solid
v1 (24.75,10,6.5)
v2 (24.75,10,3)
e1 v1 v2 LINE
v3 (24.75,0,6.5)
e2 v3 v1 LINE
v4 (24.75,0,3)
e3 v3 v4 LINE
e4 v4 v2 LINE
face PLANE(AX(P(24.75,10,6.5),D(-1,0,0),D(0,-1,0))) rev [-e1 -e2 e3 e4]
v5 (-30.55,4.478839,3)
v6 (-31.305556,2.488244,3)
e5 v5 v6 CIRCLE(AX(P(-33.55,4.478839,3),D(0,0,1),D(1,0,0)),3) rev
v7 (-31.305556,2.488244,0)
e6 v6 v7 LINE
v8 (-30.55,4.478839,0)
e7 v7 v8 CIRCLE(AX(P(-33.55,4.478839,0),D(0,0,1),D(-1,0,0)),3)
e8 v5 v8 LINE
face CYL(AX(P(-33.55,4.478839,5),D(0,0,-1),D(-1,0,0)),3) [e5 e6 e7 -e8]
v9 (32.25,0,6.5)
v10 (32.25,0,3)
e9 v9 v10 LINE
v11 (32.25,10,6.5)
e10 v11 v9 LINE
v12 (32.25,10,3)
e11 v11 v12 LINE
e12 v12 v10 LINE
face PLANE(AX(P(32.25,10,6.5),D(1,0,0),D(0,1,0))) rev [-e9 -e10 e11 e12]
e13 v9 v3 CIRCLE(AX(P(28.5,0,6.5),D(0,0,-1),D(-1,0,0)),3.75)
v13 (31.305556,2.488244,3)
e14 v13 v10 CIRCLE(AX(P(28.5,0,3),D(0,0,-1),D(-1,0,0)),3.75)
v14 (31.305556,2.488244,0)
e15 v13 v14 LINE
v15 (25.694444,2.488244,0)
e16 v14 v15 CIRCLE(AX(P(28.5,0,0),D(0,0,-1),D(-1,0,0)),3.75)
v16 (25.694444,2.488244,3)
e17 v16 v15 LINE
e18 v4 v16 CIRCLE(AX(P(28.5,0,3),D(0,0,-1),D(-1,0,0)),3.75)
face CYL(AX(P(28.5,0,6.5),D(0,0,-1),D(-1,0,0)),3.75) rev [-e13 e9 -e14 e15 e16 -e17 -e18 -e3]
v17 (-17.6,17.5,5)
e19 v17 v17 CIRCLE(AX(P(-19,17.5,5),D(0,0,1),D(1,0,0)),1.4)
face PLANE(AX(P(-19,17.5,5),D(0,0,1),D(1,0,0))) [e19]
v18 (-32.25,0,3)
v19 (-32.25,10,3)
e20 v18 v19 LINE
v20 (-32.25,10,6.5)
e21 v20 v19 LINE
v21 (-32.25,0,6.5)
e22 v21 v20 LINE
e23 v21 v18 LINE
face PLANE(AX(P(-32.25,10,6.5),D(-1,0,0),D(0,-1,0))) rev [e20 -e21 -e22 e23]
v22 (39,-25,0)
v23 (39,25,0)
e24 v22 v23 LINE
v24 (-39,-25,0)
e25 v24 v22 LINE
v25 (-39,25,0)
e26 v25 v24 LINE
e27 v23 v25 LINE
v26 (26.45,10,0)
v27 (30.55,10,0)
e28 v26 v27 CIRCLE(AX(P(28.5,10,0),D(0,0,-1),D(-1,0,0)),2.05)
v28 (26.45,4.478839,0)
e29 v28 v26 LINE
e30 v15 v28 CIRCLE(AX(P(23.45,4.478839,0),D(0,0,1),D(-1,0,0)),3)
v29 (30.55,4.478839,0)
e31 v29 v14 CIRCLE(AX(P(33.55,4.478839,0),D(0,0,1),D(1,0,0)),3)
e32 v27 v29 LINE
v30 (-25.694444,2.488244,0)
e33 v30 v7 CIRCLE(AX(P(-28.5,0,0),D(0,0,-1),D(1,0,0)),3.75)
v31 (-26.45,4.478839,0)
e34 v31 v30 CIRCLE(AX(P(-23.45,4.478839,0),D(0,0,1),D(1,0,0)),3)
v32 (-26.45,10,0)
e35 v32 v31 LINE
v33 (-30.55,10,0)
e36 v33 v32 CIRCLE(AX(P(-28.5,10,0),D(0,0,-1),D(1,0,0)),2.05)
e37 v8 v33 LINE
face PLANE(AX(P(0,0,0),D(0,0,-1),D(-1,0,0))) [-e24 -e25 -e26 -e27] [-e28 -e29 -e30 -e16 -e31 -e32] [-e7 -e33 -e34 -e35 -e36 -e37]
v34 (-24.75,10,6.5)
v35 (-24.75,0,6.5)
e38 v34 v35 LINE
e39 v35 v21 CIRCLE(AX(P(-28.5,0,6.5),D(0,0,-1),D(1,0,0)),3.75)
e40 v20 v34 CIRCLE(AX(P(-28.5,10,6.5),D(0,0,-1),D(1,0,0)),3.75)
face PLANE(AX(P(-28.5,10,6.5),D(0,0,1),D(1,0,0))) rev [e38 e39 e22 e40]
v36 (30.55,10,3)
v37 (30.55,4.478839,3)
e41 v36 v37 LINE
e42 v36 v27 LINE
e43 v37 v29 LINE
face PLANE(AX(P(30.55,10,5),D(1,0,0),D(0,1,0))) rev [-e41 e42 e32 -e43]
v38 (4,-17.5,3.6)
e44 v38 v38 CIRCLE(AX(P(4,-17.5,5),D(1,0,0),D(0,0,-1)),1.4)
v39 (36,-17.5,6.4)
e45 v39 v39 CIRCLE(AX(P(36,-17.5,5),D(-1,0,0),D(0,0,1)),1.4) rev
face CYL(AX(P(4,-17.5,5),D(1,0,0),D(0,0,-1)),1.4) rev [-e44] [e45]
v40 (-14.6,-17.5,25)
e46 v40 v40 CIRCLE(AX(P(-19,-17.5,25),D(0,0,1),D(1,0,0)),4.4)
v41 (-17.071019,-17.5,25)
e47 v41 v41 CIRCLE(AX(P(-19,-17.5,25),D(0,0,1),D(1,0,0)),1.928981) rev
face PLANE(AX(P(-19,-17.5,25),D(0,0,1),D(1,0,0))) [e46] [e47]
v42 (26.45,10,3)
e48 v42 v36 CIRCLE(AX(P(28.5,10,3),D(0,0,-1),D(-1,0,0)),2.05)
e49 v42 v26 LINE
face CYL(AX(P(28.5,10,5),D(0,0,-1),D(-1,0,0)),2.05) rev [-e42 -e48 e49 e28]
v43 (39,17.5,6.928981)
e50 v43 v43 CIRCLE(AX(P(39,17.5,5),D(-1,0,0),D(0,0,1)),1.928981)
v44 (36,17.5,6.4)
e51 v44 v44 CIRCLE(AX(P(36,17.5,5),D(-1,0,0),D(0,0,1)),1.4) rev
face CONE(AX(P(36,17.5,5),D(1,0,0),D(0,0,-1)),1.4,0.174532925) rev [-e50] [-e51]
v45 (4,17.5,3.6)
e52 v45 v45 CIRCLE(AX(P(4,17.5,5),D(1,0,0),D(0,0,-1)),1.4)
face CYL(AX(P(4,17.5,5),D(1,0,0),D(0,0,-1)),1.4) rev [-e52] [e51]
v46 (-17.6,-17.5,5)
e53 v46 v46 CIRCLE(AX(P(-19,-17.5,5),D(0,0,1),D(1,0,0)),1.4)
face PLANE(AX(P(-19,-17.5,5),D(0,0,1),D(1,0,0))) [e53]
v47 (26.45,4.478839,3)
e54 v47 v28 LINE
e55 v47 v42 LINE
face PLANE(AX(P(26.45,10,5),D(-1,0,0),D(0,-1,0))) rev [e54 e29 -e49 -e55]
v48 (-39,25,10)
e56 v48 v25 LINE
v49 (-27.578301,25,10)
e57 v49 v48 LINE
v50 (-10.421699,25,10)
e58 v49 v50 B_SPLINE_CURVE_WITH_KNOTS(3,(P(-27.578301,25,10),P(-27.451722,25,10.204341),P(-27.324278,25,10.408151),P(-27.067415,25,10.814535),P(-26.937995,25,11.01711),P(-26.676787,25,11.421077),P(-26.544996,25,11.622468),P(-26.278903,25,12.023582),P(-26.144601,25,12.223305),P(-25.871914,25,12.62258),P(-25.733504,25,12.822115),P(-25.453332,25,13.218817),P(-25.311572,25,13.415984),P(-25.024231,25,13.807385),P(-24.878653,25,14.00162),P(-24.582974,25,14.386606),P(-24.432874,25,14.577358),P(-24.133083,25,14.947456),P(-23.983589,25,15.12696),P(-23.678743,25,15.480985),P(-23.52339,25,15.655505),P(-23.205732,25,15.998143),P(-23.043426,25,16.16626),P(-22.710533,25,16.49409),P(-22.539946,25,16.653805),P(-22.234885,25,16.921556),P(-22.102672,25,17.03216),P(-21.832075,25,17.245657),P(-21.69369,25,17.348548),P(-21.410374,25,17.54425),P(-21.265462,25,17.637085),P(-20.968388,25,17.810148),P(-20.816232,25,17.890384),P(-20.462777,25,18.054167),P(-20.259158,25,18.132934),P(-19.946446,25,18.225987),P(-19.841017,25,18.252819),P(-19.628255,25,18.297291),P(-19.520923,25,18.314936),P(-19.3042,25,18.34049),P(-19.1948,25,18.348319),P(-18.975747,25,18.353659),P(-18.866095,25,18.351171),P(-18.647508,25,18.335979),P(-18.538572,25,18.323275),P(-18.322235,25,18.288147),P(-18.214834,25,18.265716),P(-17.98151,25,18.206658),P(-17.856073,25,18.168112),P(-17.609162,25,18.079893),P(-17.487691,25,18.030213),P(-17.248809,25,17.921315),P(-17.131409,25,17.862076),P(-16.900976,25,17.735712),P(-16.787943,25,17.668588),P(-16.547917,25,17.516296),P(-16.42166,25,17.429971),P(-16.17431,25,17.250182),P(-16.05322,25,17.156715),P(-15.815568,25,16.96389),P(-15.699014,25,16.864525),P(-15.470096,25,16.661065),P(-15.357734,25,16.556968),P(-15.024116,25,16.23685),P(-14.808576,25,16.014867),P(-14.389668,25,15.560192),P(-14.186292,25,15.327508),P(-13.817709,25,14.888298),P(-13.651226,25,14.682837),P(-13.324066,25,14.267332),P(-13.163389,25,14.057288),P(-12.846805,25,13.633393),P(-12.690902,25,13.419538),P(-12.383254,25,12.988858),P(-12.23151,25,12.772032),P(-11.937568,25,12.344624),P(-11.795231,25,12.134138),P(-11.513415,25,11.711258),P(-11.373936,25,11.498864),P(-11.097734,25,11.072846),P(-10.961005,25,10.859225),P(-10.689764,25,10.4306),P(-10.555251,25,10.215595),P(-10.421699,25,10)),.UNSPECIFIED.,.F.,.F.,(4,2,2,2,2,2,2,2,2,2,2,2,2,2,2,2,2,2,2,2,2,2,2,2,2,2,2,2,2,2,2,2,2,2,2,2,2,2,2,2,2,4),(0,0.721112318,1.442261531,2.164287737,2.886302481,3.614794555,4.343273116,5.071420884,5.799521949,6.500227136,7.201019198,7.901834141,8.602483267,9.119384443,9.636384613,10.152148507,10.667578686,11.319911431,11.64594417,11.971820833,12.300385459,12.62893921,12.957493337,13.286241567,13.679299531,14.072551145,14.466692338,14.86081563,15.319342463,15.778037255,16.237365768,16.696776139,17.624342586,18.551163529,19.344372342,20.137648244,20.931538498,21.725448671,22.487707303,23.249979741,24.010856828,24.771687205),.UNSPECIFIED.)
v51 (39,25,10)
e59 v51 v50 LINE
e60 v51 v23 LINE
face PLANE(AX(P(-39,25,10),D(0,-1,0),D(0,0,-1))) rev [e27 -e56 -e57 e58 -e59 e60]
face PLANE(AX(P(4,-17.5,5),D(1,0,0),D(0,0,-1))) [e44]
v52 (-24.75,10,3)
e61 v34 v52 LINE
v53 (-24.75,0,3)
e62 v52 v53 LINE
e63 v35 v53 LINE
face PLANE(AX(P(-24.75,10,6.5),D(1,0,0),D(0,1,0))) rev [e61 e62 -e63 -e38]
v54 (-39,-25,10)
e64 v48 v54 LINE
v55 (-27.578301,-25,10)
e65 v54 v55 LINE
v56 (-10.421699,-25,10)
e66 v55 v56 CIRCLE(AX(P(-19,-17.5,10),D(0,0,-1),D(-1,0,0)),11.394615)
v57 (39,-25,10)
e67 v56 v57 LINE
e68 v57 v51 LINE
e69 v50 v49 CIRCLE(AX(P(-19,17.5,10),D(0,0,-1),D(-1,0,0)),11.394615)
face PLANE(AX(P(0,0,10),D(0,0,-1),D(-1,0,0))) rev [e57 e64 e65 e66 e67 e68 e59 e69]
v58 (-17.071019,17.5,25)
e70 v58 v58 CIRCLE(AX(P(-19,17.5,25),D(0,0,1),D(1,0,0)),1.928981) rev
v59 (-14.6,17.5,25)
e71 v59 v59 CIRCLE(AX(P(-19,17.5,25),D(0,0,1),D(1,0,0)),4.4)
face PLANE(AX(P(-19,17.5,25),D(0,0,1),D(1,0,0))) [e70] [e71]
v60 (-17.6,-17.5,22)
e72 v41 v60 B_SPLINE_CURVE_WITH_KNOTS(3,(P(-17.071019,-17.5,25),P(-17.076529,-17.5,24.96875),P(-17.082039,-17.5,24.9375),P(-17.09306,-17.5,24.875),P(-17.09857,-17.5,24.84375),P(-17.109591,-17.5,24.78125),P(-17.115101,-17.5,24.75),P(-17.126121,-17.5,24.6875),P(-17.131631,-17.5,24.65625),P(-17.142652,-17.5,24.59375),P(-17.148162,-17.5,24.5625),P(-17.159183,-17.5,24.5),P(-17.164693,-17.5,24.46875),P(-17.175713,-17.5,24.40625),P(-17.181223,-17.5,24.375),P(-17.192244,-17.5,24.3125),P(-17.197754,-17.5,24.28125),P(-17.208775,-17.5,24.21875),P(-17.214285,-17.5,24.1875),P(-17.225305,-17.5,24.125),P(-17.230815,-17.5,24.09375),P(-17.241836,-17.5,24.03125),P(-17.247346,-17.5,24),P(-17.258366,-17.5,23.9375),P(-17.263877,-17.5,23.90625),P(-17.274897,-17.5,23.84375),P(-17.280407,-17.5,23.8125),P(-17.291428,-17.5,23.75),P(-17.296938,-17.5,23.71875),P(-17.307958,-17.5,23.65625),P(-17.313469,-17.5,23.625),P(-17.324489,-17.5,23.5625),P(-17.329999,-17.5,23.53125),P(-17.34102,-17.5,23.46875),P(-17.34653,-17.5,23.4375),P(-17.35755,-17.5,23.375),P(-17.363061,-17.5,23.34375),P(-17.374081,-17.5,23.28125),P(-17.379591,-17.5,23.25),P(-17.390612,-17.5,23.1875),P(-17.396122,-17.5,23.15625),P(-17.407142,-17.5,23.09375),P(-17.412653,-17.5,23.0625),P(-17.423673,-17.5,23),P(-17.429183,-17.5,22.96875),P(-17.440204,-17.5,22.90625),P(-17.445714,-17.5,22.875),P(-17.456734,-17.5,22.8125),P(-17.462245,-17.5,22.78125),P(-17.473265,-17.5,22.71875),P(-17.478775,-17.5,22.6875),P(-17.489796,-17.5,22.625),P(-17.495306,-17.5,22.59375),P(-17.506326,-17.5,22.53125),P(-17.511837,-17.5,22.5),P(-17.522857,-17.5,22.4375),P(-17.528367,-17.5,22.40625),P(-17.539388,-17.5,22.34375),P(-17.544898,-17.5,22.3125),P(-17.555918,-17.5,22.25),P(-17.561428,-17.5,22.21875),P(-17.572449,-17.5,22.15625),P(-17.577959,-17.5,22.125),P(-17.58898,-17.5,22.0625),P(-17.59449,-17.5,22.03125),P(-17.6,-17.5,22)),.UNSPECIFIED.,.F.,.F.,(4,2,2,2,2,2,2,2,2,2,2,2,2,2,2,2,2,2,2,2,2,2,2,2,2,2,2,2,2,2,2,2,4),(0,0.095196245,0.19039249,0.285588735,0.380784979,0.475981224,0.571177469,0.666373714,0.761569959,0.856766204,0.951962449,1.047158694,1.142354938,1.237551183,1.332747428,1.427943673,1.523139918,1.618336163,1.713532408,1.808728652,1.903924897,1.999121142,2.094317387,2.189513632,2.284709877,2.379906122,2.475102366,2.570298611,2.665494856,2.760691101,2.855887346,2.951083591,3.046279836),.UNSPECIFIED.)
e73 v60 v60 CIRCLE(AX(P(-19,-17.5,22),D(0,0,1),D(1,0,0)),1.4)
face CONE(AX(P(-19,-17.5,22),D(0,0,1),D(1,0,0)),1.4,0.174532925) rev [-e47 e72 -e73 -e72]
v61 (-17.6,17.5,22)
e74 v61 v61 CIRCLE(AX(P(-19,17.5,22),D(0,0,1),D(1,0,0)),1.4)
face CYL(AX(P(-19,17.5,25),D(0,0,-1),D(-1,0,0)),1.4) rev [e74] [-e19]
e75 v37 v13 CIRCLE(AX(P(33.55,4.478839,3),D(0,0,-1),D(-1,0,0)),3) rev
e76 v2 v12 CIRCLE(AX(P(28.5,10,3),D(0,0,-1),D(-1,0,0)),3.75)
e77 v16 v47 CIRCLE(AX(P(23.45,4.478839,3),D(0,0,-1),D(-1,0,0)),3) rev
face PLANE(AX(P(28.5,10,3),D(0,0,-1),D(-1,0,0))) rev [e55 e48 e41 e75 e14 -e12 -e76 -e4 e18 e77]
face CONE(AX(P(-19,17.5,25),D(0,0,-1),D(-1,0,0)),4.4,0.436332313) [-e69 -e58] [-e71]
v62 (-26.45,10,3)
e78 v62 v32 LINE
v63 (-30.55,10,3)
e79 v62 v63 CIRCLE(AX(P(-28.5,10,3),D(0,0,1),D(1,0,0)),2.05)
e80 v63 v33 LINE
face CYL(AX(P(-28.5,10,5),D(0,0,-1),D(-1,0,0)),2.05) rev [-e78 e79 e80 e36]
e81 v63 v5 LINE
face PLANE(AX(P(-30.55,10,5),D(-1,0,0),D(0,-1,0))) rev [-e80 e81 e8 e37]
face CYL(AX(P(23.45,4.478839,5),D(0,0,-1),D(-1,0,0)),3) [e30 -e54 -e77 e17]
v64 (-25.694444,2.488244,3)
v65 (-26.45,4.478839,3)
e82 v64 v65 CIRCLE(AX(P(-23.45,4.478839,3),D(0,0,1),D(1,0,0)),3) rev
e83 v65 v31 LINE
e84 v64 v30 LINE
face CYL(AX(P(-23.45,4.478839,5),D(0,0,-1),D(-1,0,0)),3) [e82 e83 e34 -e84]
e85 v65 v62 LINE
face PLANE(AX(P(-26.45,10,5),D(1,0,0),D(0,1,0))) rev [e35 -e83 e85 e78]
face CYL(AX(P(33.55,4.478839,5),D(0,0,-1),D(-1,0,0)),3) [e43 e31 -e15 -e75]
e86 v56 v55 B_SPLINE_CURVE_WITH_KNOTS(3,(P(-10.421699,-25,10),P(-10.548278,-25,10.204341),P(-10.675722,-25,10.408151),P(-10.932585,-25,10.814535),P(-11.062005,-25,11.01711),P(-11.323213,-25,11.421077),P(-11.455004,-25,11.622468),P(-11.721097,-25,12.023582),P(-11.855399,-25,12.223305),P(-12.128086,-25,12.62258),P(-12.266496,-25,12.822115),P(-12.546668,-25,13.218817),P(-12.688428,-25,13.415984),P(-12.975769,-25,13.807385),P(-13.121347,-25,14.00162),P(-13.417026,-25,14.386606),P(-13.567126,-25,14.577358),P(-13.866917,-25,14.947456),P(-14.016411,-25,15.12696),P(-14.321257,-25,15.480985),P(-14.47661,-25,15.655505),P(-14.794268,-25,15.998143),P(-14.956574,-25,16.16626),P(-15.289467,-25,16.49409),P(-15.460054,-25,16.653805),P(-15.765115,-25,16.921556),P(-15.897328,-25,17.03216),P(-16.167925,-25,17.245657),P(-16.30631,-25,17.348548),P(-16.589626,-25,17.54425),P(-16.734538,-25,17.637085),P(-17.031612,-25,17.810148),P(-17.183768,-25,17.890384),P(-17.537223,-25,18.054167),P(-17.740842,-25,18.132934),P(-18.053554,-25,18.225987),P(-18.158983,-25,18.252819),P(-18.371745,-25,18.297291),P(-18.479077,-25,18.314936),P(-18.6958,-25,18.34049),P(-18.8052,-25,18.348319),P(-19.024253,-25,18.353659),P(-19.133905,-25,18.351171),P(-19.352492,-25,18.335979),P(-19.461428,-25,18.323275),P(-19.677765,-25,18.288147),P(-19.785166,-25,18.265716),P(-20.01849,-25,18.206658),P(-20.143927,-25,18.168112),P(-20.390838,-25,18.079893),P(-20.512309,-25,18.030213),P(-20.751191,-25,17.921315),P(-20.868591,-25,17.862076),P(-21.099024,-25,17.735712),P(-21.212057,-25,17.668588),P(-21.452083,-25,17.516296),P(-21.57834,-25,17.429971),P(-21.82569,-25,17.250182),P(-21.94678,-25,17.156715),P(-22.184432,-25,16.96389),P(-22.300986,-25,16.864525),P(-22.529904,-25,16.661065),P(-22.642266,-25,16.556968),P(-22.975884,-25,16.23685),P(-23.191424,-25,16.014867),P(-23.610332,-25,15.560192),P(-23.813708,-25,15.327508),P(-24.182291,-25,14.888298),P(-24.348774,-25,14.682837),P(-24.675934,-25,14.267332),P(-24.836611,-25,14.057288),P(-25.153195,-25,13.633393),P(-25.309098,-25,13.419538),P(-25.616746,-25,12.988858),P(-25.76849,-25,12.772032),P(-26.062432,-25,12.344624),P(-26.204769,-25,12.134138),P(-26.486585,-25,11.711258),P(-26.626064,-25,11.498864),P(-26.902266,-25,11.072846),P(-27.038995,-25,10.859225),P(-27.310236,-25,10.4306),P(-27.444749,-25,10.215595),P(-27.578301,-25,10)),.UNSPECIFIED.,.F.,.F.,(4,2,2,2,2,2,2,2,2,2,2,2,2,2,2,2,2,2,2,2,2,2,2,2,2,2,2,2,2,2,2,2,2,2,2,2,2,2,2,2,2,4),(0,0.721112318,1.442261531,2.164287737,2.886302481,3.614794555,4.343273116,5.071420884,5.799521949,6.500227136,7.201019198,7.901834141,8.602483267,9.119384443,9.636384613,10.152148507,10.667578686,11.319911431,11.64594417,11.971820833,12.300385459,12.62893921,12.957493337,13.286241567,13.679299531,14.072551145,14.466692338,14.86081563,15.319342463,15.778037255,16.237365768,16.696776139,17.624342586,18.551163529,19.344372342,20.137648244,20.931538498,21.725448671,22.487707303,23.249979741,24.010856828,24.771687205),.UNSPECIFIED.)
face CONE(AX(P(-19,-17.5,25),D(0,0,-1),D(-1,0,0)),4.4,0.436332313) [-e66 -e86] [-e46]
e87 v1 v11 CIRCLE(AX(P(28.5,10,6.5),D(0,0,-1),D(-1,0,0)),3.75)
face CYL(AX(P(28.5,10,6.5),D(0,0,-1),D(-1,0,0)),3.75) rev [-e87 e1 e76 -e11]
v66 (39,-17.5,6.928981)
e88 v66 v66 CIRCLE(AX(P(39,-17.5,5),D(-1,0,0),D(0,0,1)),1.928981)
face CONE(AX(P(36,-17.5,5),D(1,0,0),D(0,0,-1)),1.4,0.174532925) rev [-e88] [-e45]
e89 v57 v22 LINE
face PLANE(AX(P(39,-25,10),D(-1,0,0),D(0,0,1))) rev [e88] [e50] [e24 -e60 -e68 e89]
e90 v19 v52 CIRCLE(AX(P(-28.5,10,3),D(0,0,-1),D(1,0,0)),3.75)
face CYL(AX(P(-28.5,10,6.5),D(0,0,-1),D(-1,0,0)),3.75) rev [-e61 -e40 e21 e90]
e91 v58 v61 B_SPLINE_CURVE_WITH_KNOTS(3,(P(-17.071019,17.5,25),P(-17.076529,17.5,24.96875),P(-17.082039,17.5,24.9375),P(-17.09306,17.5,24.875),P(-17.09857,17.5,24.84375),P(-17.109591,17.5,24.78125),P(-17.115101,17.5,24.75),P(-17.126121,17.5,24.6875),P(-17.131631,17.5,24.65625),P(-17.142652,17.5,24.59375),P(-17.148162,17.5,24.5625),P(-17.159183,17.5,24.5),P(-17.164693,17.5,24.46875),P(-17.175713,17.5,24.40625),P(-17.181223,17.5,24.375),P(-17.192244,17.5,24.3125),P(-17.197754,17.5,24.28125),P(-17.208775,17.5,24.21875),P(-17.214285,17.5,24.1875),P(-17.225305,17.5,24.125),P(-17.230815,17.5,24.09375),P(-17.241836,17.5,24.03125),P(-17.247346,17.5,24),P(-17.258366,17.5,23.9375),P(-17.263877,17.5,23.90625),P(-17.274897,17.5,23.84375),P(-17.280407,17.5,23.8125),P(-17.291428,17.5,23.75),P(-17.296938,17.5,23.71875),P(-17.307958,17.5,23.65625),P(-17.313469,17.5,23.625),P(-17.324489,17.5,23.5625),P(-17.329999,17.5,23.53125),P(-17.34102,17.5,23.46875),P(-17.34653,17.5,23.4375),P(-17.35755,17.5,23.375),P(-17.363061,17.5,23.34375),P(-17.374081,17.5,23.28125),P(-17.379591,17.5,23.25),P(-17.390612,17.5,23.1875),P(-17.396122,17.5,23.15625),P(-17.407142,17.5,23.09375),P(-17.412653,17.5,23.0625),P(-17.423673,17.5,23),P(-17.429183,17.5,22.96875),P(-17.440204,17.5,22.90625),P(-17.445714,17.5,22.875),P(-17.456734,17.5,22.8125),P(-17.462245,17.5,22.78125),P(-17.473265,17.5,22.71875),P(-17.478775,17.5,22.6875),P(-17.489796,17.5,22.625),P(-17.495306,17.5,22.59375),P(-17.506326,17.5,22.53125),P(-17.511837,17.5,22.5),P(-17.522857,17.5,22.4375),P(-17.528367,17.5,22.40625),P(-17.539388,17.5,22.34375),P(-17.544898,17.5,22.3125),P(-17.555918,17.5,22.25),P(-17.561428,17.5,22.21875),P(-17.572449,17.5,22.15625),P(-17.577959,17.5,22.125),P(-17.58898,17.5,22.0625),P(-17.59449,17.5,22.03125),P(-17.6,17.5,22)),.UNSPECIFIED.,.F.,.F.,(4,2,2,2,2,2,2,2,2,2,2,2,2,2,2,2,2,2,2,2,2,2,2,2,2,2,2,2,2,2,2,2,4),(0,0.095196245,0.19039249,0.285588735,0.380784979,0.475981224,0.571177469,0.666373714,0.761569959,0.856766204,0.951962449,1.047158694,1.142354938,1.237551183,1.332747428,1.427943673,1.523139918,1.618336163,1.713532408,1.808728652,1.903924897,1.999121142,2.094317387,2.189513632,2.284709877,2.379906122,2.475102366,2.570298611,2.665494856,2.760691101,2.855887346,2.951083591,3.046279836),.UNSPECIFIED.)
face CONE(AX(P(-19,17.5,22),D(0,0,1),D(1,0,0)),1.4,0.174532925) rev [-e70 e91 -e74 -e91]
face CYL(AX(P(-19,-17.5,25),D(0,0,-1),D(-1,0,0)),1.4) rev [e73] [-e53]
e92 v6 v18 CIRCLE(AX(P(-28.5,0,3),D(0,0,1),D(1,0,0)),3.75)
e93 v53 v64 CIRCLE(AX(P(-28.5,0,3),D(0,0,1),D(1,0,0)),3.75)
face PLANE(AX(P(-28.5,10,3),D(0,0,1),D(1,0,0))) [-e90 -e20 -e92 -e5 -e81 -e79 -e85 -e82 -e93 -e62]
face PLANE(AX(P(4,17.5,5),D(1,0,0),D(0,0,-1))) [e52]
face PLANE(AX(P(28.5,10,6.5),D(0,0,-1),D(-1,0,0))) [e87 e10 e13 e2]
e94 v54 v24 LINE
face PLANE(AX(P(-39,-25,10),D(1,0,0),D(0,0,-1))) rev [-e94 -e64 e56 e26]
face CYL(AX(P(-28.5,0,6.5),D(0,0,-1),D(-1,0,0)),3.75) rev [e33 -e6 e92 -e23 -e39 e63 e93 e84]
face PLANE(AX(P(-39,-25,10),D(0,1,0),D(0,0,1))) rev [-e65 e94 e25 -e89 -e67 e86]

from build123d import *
from OCP.BRepFilletAPI import BRepFilletAPI_MakeChamfer

# Parameters (mm, degrees)
SKETCH1_W           = 78
SKETCH1_H           = 50
BOSS_EXTRUDE1_DEPTH = 10
SKETCH3_R           = 4.4
SKETCH3_R_2         = 1.4
BOSS_EXTRUDE2_DEPTH = 15
CUT_EXTRUDE2_START  = -5
SKETCH4_R           = 1.4
CUT_EXTRUDE2_DEPTH  = 5
SKETCH5_R           = 1.4
CUT_EXTRUDE3_DEPTH  = 35
CHAMFER1_SIZE       = 3
CHAMFER1_SIZE2      = 0.528980942
CHAMFER2_SIZE       = 6.994614872
CHAMFER2_SIZE_2     = 15
CUT_EXTRUDE4_START  = -3
CUT_EXTRUDE4_DEPTH  = 3.5
CUT_EXTRUDE5_START  = -3
CUT_EXTRUDE5_DEPTH  = 3


# Read off the part's stored shape, not the designer's step: Cut-Extrude5
with BuildPart() as part:
    # Sketch1 → Boss-Extrude1 (new body)
    with BuildSketch(Plane.XY):
        Rectangle(SKETCH1_W, SKETCH1_H)
    extrude(amount=BOSS_EXTRUDE1_DEPTH)

    # Sketch3 → Boss-Extrude2 (add)
    # profile 1 of 2: a face of its own
    with BuildSketch(Plane.XY.offset(10)):
        with Locations(Location((-19, 17.5, 0), (0, 0, 180))):
            Circle(SKETCH3_R)
        with Locations((-19, 17.5)):
            Circle(SKETCH3_R_2, mode=Mode.SUBTRACT)
    # profile 2 of 2: a face of its own
    with BuildSketch(Plane.XY.offset(10)):
        with Locations(Location((-19, -17.5, 0), (0, 0, 180))):
            Circle(SKETCH3_R)
        with Locations((-19, -17.5)):
            Circle(SKETCH3_R_2, mode=Mode.SUBTRACT)
    extrude(amount=BOSS_EXTRUDE2_DEPTH)

    # Sketch4 → Cut-Extrude2 (cut)
    with BuildSketch(Plane.XY.offset(10).offset(CUT_EXTRUDE2_START)):
        with Locations((-19, 17.5)):
            Circle(SKETCH4_R)
        with Locations((-19, -17.5)):
            Circle(SKETCH4_R)
    extrude(amount=CUT_EXTRUDE2_DEPTH, mode=Mode.SUBTRACT)

    # Sketch5 → Cut-Extrude3 (cut)
    with BuildSketch(Plane(origin=(39, 0, 0), x_dir=(0, 0, -1), z_dir=(1, 0, 0))):
        with Locations((-5, 17.5)):
            Circle(SKETCH5_R)
        with Locations((-5, -17.5)):
            Circle(SKETCH5_R)
    extrude(amount=-CUT_EXTRUDE3_DEPTH, mode=Mode.SUBTRACT)

    # Chamfer1: one chamfer whose edges measure the first distance from different faces: ONE call of the kernel's chamfer builder (chamfer() names one face for all edges)
    chamfer1_edges_1 = [part.edges().sort_by_distance(p)[0] for p in [
        (-20.4, -17.5, 25),
    ]]
    chamfer1_side_1 = [part.faces().sort_by_distance(p)[0] for p in [
        (-20.4, -17.5, 15),
    ]]
    chamfer1_edges_2 = [part.edges().sort_by_distance(p)[0] for p in [
        (-20.4, 17.5, 25),
    ]]
    chamfer1_side_2 = [part.faces().sort_by_distance(p)[0] for p in [
        (-20.4, 17.5, 15),
    ]]
    chamfer1_edges_3 = [part.edges().sort_by_distance(p)[0] for p in [
        (39, 17.5, 6.4),
    ]]
    chamfer1_side_3 = [part.faces().sort_by_distance(p)[0] for p in [
        (21.5, 17.5, 6.4),
    ]]
    chamfer1_edges_4 = [part.edges().sort_by_distance(p)[0] for p in [
        (39, -17.5, 6.4),
    ]]
    chamfer1_side_4 = [part.faces().sort_by_distance(p)[0] for p in [
        (21.5, -17.5, 6.4),
    ]]
    chamfer1 = BRepFilletAPI_MakeChamfer(part.part.solid().wrapped)
    for e in chamfer1_edges_1:
        chamfer1.Add(CHAMFER1_SIZE, CHAMFER1_SIZE2, e.wrapped, chamfer1_side_1[0].wrapped)  # the first distance lies on this face
    for e in chamfer1_edges_2:
        chamfer1.Add(CHAMFER1_SIZE, CHAMFER1_SIZE2, e.wrapped, chamfer1_side_2[0].wrapped)  # the first distance lies on this face
    for e in chamfer1_edges_3:
        chamfer1.Add(CHAMFER1_SIZE, CHAMFER1_SIZE2, e.wrapped, chamfer1_side_3[0].wrapped)  # the first distance lies on this face
    for e in chamfer1_edges_4:
        chamfer1.Add(CHAMFER1_SIZE, CHAMFER1_SIZE2, e.wrapped, chamfer1_side_4[0].wrapped)  # the first distance lies on this face
    add(Compound.cast(chamfer1.Shape()), mode=Mode.REPLACE)

    # Chamfer2
    # the kernel refuses this chamfer: 15, 6.994614872 mm, written as the material it adds along each edge
    with BuildSketch(Plane(origin=(-19, 17.5, 10), x_dir=(-1, 0, 0), z_dir=(0, 1, 0))) as chamfer2_piece_1_section:
        Polygon((4.4 + CHAMFER2_SIZE, 0), (4.4, CHAMFER2_SIZE_2), (4.4, 0), align=None)
    chamfer2_piece_1 = revolve(axis=Axis((-19, 17.5, 10), (0, 0, 1)), mode=Mode.PRIVATE)
    chamfer2_piece_1 = split(chamfer2_piece_1, bisect_by=Plane(origin=(-11.096055179, 25, 17.172081688), z_dir=(0, -1, 0)), keep=Keep.TOP, mode=Mode.PRIVATE)
    chamfer2_piece_1 = split(chamfer2_piece_1, bisect_by=Plane(origin=(-11.096055179, 17.5, 25), z_dir=(0, 0, -1)), keep=Keep.TOP, mode=Mode.PRIVATE)
    add(chamfer2_piece_1)
    with BuildSketch(Plane(origin=(-19, -17.5, 10), x_dir=(-1, 0, 0), z_dir=(0, 1, 0))) as chamfer2_piece_2_section:
        Polygon((4.4 + CHAMFER2_SIZE, 0), (4.4, CHAMFER2_SIZE_2), (4.4, 0), align=None)
    chamfer2_piece_2 = revolve(axis=Axis((-19, -17.5, 10), (0, 0, 1)), mode=Mode.PRIVATE)
    chamfer2_piece_2 = split(chamfer2_piece_2, bisect_by=Plane(origin=(-11.096055179, -25, 17.172081688), z_dir=(0, 1, 0)), keep=Keep.TOP, mode=Mode.PRIVATE)
    chamfer2_piece_2 = split(chamfer2_piece_2, bisect_by=Plane(origin=(-11.096055179, -17.5, 25), z_dir=(0, 0, -1)), keep=Keep.TOP, mode=Mode.PRIVATE)
    add(chamfer2_piece_2)

    # Sketch6 → Cut-Extrude4 (cut)
    with BuildSketch(Plane(origin=(0, 0, 0), x_dir=(-1, 0, 0), z_dir=(0, 0, -1)).offset(CUT_EXTRUDE4_START)):
        with BuildLine():
            Line((-24.75, 10), (-24.75, 0))
            ThreePointArc((-24.75, 0), (-28.5, -3.75), (-32.25, 0))
            Line((-32.25, 0), (-32.25, 10))
            ThreePointArc((-32.25, 10), (-28.5, 13.75), (-24.75, 10))
        make_face()
        with BuildLine():
            Line((24.75, 10), (24.75, 0))
            ThreePointArc((24.75, 0), (28.5, -3.75), (32.25, 0))
            Line((32.25, 0), (32.25, 10))
            ThreePointArc((32.25, 10), (28.5, 13.75), (24.75, 10))
        make_face()
    extrude(amount=-CUT_EXTRUDE4_DEPTH, mode=Mode.SUBTRACT)

    # Cut-Extrude5 outline → Cut-Extrude5 (cut)
    with BuildSketch(Plane(origin=(0, 0, 0), x_dir=(-1, 0, 0), z_dir=(0, 0, -1)).offset(CUT_EXTRUDE5_START)):
        with BuildLine():
            ThreePointArc((26.45, 4.478839135), (26.254757862, 3.41425784), (25.694444444, 2.488243964))
            ThreePointArc((25.694444444, 2.488243964), (28.5, -3.75), (31.305555556, 2.488243964))
            ThreePointArc((31.305555556, 2.488243964), (30.745242138, 3.41425784), (30.55, 4.478839135))
            Line((30.55, 4.478839135), (30.55, 10))
            ThreePointArc((30.55, 10), (28.5, 12.05), (26.45, 10))
            Line((26.45, 10), (26.45, 4.478839135))
        make_face()
        with BuildLine():
            ThreePointArc((-25.694444444, 2.488243964), (-26.254757862, 3.41425784), (-26.45, 4.478839135))
            Line((-26.45, 4.478839135), (-26.45, 10))
            ThreePointArc((-26.45, 10), (-28.5, 12.05), (-30.55, 10))
            Line((-30.55, 10), (-30.55, 4.478839135))
            ThreePointArc((-30.55, 4.478839135), (-30.745242138, 3.41425784), (-31.305555556, 2.488243964))
            ThreePointArc((-31.305555556, 2.488243964), (-28.5, -3.75), (-25.694444444, 2.488243964))
        make_face()
    extrude(amount=CUT_EXTRUDE5_DEPTH, mode=Mode.SUBTRACT)


solid = part.part
